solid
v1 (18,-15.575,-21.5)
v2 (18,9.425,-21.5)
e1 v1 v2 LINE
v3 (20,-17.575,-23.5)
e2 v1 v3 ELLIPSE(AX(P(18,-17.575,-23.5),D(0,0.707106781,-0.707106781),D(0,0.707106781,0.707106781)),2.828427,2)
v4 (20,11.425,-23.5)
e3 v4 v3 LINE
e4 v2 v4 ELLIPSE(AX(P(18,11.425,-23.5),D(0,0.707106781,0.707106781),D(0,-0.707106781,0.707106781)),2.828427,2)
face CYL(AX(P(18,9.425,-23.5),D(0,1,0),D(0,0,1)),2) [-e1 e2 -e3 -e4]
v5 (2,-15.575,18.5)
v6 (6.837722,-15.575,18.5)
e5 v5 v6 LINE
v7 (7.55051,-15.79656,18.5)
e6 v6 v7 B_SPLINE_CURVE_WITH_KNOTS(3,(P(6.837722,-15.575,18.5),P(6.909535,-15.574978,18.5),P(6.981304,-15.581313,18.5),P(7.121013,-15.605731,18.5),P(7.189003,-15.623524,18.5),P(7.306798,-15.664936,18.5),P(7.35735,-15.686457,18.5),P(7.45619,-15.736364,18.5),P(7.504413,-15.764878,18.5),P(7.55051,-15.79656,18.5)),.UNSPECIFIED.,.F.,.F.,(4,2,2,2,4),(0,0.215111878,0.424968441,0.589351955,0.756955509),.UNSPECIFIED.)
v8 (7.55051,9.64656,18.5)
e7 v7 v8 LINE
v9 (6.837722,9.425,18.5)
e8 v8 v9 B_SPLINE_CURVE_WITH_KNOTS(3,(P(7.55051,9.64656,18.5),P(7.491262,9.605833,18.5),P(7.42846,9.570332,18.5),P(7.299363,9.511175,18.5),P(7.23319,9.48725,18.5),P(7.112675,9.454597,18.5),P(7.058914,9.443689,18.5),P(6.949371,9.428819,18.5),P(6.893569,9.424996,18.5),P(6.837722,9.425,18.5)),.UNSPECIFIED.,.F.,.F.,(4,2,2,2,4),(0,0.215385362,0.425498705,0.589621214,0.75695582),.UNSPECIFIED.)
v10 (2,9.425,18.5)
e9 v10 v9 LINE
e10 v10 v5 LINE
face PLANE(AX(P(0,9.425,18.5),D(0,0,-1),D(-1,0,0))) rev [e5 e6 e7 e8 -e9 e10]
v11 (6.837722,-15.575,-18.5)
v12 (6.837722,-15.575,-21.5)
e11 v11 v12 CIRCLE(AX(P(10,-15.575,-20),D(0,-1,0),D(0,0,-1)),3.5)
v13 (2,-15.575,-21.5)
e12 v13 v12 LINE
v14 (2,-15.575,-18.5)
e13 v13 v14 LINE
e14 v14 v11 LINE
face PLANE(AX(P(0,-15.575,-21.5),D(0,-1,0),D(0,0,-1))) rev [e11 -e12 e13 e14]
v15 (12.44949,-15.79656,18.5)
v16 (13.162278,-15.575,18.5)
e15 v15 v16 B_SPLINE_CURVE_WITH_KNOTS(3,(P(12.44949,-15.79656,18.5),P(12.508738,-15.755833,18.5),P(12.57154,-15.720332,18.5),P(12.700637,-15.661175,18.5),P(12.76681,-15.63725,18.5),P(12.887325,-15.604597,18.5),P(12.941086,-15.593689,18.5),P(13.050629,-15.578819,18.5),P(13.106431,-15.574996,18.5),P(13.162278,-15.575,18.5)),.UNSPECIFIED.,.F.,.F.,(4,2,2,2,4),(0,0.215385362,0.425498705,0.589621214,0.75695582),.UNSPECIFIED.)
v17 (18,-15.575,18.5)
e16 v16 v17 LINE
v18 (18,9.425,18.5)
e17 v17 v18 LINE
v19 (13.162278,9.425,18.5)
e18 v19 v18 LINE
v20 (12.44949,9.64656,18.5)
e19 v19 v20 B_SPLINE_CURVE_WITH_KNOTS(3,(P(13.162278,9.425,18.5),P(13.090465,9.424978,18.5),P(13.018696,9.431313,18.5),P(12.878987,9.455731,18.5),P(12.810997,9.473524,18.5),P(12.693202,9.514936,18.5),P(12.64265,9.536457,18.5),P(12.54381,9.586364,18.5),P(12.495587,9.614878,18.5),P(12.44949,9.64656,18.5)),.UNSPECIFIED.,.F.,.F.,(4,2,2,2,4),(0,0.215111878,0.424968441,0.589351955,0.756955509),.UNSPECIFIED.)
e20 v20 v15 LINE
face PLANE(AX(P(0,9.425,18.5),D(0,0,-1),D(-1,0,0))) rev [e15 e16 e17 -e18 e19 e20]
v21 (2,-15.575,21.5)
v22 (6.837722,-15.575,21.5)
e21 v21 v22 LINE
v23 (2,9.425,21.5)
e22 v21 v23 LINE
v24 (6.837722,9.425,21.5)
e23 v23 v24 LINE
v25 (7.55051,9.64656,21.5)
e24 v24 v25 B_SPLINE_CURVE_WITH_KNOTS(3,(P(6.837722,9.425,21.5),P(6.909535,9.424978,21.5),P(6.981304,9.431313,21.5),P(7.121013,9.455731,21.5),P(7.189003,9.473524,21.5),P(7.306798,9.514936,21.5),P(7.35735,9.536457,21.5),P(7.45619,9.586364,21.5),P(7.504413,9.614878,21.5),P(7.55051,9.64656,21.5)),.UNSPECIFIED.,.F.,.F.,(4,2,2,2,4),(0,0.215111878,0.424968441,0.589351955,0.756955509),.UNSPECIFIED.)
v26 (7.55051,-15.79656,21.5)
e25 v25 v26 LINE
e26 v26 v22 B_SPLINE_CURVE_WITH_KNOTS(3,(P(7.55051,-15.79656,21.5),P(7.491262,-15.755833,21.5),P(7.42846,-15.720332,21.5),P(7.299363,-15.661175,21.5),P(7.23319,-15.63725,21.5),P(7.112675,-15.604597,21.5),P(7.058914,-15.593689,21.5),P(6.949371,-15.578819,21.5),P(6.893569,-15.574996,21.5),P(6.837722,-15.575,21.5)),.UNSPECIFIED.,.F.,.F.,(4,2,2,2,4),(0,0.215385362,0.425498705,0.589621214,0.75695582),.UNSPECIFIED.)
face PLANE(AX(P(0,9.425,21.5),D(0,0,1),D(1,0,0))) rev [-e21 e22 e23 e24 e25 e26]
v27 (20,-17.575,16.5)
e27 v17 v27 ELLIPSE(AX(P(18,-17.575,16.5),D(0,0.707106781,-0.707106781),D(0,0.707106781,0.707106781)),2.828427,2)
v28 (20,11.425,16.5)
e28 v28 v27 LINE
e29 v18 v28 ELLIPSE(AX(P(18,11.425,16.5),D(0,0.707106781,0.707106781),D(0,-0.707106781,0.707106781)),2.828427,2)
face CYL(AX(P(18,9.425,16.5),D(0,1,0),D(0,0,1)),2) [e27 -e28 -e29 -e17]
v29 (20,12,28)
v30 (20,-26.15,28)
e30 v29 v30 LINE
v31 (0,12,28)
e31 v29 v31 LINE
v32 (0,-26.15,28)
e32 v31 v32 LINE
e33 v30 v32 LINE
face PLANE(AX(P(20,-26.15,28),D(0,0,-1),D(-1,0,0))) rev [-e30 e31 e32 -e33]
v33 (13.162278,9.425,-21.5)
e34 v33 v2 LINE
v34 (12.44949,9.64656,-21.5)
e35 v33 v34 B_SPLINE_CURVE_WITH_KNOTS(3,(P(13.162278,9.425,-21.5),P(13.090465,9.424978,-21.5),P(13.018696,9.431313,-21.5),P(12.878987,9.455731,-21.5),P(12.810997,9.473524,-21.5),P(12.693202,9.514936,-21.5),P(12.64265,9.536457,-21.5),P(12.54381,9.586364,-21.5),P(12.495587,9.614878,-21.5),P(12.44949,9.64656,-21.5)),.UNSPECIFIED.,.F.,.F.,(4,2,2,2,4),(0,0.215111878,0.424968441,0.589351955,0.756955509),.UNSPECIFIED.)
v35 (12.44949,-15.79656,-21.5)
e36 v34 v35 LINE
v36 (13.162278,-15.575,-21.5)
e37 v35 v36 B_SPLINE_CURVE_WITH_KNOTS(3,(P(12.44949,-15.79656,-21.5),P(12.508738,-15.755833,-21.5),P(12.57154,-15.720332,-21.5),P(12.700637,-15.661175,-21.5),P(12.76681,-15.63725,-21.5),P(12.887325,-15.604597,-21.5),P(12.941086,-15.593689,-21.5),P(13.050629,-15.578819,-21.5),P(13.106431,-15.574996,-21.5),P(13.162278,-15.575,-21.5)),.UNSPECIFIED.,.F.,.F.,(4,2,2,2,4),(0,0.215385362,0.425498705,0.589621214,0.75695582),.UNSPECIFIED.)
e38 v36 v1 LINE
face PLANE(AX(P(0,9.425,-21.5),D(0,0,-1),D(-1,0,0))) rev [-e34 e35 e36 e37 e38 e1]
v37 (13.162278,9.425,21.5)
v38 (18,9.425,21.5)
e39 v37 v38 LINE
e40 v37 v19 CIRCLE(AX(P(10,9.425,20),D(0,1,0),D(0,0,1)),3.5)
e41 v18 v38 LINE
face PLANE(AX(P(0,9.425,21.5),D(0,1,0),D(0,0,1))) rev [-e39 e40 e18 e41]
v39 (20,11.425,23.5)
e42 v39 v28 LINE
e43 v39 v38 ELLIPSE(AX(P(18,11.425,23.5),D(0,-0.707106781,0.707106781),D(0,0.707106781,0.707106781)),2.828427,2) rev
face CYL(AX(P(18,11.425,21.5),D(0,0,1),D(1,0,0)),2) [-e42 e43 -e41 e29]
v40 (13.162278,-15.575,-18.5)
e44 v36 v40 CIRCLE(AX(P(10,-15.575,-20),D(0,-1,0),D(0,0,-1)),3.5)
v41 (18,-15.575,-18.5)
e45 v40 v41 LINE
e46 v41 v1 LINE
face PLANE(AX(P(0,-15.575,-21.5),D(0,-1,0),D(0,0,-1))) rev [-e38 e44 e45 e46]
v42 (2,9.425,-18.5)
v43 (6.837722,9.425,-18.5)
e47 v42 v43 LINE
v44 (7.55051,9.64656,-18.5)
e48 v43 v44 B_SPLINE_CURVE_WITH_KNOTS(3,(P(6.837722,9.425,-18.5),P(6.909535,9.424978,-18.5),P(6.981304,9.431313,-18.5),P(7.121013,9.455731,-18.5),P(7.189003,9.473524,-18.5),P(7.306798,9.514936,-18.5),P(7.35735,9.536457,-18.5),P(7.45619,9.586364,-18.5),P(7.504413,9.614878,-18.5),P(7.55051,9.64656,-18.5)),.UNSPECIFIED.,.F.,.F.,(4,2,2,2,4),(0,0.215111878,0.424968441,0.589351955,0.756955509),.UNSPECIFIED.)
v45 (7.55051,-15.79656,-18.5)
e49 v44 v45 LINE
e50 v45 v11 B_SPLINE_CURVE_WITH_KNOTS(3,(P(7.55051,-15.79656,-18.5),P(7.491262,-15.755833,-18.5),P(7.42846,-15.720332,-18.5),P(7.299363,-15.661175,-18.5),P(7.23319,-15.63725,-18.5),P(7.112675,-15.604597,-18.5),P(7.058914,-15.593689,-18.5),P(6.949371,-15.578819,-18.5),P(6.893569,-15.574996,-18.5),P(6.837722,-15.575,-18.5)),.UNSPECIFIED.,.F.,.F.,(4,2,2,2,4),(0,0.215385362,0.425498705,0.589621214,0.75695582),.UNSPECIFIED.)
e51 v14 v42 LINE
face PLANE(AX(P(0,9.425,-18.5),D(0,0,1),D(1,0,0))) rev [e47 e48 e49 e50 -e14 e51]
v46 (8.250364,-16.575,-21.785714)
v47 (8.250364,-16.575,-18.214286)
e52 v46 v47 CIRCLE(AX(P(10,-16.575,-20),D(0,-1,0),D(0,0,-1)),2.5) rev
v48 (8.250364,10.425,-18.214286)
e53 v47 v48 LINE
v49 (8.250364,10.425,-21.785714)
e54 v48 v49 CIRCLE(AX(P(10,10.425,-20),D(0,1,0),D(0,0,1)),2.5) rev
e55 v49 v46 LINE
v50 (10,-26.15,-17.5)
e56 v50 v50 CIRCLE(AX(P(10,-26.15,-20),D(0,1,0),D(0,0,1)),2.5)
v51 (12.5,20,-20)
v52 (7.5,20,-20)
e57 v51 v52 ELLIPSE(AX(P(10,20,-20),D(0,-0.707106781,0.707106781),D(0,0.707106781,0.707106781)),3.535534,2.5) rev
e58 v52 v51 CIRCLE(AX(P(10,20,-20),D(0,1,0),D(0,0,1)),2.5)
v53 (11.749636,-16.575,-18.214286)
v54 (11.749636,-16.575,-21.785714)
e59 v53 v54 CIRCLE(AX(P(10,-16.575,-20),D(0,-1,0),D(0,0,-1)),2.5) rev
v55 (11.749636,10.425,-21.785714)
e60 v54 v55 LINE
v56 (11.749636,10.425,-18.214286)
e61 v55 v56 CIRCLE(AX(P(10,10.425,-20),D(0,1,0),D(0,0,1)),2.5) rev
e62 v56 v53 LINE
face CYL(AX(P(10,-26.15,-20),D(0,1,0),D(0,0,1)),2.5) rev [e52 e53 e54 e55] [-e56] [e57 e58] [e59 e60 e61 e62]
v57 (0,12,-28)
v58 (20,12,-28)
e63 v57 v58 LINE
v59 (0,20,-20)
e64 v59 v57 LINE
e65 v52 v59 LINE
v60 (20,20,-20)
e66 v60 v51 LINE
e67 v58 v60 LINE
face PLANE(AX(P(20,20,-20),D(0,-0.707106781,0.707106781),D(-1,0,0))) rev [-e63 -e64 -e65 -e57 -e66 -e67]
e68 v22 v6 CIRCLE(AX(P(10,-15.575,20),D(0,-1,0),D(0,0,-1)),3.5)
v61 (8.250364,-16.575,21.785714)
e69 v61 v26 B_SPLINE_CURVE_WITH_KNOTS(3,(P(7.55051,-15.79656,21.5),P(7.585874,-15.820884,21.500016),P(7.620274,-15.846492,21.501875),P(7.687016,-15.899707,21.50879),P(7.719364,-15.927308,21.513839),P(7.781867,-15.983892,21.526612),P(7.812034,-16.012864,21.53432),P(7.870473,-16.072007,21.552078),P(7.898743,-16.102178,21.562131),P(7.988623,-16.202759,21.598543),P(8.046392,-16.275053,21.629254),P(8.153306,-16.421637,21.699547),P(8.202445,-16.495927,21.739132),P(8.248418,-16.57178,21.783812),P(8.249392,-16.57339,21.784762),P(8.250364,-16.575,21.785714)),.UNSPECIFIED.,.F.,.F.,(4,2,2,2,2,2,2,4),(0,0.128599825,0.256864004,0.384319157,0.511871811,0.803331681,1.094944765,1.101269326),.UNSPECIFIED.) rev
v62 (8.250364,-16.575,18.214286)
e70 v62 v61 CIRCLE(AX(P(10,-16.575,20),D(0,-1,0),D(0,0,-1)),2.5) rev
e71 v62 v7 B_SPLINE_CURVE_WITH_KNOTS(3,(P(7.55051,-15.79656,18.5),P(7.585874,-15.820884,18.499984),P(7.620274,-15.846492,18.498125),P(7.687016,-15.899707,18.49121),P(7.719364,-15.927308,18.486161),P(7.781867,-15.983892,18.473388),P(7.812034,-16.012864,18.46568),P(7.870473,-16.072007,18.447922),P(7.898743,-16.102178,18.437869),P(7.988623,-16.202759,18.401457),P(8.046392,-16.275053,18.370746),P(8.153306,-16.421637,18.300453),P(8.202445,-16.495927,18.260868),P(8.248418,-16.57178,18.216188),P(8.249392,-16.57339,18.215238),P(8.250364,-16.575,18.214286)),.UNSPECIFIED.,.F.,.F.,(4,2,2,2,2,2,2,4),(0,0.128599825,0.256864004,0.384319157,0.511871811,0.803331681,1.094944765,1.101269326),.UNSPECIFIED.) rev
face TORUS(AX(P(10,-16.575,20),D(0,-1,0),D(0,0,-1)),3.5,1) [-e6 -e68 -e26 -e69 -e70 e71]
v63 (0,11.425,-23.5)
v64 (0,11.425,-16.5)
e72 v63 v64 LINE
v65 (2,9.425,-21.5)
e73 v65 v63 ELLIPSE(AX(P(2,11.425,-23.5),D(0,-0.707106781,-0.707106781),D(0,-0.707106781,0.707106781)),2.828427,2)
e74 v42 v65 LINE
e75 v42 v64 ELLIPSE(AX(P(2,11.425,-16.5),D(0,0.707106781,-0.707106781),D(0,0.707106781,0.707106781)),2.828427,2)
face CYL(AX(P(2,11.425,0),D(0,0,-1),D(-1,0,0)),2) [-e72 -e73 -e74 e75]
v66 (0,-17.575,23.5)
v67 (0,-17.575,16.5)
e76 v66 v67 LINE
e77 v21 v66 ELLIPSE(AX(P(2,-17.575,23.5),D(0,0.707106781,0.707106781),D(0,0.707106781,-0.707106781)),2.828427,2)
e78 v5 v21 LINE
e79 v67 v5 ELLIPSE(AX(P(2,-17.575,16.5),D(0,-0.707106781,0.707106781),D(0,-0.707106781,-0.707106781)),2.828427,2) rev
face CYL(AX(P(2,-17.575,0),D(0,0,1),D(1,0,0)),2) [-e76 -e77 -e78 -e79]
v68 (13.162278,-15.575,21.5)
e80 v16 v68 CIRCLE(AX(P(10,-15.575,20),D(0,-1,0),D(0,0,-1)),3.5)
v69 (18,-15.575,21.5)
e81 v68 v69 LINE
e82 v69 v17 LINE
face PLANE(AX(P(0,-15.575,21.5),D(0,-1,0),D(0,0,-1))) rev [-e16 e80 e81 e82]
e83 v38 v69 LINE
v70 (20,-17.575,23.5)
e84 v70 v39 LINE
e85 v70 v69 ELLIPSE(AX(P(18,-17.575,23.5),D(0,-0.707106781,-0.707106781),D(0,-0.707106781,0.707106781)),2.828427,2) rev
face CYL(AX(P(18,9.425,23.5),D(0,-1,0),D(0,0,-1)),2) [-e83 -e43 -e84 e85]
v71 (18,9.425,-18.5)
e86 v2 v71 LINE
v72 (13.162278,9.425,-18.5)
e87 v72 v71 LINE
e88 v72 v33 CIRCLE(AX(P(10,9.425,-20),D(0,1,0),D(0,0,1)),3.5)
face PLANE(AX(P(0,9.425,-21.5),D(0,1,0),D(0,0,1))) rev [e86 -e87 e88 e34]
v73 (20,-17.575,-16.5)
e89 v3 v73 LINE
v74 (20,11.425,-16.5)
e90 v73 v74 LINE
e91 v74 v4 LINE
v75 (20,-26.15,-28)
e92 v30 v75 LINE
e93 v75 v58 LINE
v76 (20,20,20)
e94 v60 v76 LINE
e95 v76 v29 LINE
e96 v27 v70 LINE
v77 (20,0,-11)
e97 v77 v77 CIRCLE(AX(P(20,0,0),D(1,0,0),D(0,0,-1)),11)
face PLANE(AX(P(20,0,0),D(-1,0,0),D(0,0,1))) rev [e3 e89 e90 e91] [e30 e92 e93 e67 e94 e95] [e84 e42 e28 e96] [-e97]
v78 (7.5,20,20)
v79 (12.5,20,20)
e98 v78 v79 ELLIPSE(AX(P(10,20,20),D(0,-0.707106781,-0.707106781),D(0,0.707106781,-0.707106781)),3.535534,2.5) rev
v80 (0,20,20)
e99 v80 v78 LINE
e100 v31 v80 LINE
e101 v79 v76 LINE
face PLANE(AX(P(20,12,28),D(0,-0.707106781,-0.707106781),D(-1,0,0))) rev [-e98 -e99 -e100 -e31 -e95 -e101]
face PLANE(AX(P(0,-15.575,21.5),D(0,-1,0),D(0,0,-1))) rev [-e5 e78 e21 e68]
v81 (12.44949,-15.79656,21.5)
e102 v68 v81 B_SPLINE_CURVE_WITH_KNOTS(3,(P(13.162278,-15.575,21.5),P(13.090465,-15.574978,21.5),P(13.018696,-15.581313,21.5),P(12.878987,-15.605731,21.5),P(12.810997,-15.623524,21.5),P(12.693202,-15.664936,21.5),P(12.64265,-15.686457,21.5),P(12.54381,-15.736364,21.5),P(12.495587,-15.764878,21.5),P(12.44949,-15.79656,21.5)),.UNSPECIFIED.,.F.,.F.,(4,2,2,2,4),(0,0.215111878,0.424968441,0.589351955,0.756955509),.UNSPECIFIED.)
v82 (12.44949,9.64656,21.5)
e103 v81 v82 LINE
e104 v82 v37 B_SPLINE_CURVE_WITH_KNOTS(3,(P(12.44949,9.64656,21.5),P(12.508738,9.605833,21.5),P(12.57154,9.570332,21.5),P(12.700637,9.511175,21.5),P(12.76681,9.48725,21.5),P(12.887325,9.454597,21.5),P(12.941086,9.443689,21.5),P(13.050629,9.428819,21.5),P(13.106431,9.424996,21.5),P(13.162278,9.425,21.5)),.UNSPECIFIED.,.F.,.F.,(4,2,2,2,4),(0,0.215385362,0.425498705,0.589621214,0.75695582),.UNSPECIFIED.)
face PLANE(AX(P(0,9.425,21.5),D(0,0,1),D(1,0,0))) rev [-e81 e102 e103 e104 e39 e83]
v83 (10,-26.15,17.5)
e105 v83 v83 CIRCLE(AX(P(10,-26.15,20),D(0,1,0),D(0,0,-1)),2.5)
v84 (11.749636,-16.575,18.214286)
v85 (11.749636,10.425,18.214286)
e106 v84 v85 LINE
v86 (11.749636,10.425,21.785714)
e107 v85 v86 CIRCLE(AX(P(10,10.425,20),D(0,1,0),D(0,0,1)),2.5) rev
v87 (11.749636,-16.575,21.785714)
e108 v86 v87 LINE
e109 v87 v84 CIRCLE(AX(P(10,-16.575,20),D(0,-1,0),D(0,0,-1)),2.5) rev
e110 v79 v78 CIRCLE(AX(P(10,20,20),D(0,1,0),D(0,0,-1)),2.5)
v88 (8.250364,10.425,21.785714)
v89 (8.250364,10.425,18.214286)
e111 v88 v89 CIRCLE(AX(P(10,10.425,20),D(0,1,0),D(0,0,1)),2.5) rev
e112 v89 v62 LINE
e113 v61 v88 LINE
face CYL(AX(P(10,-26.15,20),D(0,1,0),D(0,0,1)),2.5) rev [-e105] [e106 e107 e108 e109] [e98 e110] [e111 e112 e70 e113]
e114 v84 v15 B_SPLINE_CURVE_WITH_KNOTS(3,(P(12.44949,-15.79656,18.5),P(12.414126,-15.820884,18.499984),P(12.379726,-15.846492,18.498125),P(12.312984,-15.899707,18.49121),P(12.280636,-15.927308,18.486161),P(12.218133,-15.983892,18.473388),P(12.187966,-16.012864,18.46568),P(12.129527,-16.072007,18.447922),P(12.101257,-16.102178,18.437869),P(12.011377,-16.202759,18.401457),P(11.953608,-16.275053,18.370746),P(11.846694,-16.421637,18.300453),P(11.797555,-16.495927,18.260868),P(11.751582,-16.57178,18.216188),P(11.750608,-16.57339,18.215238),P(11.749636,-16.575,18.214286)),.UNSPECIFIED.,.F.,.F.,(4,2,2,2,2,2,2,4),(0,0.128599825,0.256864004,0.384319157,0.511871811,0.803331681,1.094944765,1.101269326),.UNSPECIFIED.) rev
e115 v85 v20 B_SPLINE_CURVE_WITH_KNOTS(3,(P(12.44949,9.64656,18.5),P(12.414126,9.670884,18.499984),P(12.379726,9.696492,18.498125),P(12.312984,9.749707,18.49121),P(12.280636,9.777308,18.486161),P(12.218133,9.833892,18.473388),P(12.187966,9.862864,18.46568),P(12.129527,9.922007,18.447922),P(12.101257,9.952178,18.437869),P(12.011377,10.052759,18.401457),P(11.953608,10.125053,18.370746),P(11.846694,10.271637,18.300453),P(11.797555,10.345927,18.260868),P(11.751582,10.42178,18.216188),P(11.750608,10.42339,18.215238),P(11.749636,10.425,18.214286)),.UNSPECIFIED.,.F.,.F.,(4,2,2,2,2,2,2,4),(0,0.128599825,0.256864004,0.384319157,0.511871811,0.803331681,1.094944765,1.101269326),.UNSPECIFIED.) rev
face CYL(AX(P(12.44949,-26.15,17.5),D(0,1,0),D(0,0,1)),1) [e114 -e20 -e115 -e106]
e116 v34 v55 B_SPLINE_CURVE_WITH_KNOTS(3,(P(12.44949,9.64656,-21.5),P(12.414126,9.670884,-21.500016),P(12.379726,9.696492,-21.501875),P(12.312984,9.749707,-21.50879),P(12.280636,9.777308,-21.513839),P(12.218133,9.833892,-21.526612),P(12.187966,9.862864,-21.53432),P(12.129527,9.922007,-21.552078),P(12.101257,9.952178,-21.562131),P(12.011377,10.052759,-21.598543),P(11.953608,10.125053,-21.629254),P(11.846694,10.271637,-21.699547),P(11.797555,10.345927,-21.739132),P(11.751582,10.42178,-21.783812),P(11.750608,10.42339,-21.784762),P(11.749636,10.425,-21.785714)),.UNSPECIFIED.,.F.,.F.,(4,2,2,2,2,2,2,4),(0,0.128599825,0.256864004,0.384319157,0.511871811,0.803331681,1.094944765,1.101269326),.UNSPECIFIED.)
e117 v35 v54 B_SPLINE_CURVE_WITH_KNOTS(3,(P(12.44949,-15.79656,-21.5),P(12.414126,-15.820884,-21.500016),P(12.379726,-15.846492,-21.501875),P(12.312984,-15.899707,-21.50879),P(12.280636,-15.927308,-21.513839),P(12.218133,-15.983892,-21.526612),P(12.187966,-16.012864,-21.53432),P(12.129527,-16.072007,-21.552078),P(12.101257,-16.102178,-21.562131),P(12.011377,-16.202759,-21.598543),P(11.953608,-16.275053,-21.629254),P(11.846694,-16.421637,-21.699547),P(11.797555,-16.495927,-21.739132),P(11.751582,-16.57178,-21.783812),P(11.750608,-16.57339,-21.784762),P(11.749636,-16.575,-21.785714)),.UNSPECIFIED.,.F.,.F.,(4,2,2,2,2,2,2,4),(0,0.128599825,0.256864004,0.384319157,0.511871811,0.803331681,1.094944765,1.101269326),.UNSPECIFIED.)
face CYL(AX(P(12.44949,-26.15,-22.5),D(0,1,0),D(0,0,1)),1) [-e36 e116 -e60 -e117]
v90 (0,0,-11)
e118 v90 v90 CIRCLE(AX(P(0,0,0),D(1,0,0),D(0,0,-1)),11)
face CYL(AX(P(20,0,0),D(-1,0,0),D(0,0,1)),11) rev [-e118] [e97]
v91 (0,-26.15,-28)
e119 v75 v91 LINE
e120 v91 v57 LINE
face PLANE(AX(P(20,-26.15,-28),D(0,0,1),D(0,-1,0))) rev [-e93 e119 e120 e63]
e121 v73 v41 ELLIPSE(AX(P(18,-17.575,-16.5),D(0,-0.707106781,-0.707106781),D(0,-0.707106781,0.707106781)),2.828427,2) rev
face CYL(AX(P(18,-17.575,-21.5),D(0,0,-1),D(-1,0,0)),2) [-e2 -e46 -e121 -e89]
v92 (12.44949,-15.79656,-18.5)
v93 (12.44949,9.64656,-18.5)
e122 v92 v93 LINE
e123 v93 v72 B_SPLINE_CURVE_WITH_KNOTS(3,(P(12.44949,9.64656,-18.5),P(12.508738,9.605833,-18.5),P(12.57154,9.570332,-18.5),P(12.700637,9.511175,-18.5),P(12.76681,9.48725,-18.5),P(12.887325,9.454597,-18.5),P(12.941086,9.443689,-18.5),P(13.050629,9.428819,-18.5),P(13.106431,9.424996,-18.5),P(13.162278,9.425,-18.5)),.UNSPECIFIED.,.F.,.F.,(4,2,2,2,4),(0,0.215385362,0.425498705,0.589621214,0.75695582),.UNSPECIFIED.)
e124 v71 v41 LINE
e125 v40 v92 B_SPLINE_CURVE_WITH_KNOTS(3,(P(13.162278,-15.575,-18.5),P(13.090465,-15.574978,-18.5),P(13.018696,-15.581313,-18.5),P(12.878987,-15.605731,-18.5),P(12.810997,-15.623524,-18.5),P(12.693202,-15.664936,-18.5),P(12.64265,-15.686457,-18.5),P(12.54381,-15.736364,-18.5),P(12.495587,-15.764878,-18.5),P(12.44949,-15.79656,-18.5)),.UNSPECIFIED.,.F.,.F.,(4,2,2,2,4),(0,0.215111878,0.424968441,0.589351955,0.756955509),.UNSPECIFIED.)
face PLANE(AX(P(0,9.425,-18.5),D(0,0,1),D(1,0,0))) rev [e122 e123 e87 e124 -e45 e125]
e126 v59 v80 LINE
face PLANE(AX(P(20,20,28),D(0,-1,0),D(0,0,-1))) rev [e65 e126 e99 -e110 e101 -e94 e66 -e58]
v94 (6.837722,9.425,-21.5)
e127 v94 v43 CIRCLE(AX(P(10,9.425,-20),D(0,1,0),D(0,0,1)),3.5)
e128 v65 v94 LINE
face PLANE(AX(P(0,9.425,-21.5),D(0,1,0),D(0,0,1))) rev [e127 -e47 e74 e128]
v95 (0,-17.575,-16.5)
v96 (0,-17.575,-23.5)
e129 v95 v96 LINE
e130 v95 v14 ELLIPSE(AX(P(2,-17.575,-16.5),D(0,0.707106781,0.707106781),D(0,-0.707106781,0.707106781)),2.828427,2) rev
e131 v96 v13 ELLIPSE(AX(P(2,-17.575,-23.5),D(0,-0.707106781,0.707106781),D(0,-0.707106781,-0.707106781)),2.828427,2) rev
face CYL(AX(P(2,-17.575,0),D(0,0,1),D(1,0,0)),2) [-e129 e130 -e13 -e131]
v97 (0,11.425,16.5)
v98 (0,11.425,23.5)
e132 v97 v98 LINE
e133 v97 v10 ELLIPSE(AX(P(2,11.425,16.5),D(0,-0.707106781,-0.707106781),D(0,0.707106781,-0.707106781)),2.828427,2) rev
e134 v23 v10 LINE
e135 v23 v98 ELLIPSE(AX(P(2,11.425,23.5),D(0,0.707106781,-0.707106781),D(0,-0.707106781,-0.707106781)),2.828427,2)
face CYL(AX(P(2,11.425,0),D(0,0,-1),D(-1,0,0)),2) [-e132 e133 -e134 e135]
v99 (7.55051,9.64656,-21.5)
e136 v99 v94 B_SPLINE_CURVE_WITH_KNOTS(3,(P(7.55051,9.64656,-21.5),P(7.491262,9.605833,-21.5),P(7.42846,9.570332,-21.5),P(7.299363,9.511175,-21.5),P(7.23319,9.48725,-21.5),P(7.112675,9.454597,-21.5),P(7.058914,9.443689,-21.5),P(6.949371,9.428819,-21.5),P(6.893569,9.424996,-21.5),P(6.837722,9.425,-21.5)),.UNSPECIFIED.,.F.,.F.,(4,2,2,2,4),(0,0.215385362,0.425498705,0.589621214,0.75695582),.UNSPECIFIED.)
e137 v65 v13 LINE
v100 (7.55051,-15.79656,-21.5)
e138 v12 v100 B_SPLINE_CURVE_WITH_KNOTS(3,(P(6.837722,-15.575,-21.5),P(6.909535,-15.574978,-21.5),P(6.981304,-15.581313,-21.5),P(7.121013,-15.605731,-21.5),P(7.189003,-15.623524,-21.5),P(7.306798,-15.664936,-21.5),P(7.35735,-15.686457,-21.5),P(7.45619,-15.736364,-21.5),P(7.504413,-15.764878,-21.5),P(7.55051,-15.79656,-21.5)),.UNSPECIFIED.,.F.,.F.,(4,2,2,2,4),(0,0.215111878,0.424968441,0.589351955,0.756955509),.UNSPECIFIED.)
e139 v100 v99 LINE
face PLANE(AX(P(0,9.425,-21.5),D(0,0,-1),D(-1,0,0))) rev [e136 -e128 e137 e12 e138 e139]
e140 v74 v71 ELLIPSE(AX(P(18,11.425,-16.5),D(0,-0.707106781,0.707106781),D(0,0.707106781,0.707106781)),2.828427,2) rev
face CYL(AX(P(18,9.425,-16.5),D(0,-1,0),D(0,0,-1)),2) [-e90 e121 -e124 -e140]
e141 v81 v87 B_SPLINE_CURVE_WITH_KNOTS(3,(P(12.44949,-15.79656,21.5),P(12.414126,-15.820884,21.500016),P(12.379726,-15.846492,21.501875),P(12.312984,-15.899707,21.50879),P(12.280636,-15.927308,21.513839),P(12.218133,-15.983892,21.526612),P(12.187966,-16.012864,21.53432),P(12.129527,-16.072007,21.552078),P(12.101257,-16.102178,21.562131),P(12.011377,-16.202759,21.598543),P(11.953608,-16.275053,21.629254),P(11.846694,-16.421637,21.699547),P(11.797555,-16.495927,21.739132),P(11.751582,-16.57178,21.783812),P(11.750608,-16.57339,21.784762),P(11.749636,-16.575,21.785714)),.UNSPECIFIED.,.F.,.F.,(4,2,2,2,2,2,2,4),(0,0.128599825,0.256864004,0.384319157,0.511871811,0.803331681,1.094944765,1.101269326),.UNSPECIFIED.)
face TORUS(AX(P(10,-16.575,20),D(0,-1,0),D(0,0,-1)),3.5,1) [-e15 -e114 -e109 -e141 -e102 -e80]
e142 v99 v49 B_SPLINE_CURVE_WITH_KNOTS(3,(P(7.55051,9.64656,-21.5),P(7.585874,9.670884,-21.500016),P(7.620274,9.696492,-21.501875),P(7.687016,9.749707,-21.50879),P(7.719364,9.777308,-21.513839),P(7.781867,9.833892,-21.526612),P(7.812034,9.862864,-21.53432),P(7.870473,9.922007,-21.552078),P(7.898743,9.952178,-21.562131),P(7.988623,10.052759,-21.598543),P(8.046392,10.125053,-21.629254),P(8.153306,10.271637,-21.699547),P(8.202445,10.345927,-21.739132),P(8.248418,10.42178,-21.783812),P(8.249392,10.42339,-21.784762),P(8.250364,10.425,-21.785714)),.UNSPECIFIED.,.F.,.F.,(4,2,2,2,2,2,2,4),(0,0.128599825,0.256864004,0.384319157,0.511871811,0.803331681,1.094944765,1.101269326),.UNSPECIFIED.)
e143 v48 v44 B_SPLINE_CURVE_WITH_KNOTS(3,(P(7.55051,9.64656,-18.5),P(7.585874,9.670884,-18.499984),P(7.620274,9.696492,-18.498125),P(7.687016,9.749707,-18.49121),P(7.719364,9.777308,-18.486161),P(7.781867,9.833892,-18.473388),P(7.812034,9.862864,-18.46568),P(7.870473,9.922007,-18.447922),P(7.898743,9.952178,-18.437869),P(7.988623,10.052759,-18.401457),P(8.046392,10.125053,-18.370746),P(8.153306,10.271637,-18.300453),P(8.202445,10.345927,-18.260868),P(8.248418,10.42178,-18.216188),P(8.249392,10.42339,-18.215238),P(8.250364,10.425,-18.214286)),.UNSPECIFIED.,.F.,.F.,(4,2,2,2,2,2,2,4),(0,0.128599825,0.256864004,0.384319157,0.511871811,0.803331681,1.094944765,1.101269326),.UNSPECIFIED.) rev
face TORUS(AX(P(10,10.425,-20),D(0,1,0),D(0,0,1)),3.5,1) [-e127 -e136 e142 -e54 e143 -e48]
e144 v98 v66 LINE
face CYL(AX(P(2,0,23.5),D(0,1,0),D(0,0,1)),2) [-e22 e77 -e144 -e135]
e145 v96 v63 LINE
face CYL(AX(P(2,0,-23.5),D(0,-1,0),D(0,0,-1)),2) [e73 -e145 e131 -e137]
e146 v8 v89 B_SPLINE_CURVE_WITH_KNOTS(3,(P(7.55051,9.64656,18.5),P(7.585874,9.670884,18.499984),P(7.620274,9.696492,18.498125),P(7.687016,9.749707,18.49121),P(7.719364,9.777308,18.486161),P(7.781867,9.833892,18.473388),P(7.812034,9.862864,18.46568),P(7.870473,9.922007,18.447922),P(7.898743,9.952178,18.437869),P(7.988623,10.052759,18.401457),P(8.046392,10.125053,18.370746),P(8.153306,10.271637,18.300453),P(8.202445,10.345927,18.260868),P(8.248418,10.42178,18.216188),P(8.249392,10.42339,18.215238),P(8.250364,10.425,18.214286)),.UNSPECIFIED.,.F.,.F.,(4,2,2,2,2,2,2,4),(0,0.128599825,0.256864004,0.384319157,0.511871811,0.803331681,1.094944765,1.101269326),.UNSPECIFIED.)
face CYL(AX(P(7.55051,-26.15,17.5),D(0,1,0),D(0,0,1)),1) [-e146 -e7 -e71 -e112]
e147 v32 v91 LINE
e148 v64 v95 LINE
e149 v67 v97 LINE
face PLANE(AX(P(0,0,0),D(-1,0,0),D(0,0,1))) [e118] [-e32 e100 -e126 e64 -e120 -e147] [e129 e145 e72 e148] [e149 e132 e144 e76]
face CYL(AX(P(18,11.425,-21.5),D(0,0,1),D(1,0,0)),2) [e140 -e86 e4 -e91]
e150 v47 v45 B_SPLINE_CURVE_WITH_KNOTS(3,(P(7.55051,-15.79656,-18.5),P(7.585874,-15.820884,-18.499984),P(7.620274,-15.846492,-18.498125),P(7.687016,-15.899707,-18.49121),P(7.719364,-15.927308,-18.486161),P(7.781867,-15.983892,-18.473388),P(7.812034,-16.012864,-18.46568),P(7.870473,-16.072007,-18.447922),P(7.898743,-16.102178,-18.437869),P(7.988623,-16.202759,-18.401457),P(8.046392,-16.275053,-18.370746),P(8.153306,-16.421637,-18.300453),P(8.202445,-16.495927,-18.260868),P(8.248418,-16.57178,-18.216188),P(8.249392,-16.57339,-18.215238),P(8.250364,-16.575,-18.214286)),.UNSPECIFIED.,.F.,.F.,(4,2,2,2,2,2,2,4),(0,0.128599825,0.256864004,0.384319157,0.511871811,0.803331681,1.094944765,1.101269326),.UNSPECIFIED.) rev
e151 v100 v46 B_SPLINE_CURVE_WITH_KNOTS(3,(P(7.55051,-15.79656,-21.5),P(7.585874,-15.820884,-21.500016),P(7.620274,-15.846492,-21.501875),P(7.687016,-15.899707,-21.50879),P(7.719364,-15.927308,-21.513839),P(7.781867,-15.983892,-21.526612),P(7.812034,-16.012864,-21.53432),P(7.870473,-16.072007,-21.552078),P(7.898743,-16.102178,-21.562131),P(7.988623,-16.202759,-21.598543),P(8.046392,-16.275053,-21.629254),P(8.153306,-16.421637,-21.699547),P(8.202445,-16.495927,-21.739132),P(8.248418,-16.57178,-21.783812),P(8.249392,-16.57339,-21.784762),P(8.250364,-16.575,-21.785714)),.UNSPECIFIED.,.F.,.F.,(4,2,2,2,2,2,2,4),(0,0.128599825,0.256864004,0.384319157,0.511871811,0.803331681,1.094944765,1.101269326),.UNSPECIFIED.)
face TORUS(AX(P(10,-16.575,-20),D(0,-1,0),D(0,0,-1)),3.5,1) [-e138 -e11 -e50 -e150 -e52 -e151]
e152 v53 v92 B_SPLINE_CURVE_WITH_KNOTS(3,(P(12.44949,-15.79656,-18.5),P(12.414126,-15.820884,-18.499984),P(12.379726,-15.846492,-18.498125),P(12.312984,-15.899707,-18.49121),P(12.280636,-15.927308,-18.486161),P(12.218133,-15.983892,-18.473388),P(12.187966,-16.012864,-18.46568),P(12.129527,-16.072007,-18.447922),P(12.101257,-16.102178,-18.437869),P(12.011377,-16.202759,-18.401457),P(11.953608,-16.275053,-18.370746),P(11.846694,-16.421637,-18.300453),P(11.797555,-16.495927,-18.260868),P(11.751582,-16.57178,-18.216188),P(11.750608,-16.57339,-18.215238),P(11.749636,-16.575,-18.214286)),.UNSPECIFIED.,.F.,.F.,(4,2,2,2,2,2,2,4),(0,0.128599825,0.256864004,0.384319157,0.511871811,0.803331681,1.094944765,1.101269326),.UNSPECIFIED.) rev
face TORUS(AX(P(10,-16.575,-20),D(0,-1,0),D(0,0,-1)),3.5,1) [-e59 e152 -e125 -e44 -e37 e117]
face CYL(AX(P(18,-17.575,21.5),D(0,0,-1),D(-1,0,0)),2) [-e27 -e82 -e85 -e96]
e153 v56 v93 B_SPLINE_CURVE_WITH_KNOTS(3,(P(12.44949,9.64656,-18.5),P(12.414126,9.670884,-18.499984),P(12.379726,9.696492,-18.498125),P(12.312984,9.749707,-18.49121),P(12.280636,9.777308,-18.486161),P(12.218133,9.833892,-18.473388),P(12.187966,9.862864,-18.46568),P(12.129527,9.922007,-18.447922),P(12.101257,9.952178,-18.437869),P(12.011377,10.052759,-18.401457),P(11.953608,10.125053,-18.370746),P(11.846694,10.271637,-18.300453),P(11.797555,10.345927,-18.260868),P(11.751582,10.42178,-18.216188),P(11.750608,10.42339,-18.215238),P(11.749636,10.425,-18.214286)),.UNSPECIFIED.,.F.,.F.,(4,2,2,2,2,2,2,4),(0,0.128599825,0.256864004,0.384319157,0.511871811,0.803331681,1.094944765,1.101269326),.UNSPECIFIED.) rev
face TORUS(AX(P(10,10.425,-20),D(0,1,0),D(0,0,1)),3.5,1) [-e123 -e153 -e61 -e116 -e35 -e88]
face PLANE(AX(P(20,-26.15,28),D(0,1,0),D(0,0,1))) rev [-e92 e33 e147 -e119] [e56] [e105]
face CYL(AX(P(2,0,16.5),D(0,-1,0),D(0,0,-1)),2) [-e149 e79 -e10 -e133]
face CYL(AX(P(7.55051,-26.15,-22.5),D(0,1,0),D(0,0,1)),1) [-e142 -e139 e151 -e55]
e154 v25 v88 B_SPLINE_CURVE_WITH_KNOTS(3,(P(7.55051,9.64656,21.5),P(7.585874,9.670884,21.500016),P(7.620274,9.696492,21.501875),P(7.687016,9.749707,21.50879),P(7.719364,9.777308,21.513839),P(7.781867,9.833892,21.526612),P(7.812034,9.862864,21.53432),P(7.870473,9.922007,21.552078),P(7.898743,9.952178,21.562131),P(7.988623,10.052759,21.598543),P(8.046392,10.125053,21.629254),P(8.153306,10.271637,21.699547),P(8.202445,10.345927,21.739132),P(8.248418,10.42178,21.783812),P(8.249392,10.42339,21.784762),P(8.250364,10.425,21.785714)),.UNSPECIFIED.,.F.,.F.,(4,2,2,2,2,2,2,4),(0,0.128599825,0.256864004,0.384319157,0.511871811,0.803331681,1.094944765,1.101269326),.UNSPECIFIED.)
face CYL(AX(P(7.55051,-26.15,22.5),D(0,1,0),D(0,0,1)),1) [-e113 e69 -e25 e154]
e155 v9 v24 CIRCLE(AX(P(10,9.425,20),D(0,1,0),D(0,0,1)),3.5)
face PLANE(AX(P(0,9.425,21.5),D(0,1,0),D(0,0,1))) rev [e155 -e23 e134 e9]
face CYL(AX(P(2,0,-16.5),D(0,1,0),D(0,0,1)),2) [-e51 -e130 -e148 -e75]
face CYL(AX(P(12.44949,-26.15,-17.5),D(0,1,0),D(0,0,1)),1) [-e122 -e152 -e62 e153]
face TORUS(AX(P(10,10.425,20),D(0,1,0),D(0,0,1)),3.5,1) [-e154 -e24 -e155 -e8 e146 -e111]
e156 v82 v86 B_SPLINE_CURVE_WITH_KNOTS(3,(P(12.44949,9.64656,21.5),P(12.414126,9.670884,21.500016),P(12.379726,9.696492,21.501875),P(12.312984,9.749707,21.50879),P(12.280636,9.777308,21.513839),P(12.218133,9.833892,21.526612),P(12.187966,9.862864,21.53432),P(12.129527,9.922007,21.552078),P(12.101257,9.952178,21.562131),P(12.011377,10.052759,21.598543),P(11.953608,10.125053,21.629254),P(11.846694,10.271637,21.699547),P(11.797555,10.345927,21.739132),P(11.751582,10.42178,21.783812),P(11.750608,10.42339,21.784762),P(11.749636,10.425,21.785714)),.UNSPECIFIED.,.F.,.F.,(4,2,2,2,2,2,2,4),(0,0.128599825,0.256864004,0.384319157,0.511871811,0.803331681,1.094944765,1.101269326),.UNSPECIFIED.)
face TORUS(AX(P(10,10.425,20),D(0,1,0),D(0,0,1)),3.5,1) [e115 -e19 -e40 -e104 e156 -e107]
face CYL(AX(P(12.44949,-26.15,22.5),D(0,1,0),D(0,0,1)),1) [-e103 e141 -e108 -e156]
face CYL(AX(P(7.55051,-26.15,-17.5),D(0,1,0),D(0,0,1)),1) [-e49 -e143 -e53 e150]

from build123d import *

# Parameters (mm, degrees)
SKETCH_2_W          = 56
SKETCH_2_H          = 46.15
SKETCH_2_R          = 11
EXTRUDE_1_DEPTH     = 20
SKETCH_3_R          = 2.5
CUT_EXTRUDE_1_DEPTH = 58.565810165
SKETCH_4_W          = 3
SKETCH_4_H          = 25
CUT_EXTRUDE_2_DEPTH = 44.218312091
CHAMFER_1_SIZE      = 8
FILLET_1_R          = 1
FILLET_2_R          = 2


with BuildPart() as part:
    # 스케치2 → 보스-돌출1 (new body)
    with BuildSketch(Plane(origin=(0, 0, 0), x_dir=(0, 0, -1), z_dir=(1, 0, 0))):
        with Locations((0, -3.075)):
            Rectangle(SKETCH_2_W, SKETCH_2_H)
        Circle(SKETCH_2_R, mode=Mode.SUBTRACT)
    extrude(amount=EXTRUDE_1_DEPTH)

    # 스케치3 → 컷-돌출1 (cut, through all)
    with BuildSketch(Plane(origin=(0, 20, 0), x_dir=(1, 0, 0), z_dir=(0, 1, 0))):
        with Locations(Location((10, 20, 0), (0, 0, 270))):
            Circle(SKETCH_3_R)
        with Locations(Location((10, -20, 0), (0, 0, 90))):
            Circle(SKETCH_3_R)
    extrude(amount=-CUT_EXTRUDE_1_DEPTH, mode=Mode.SUBTRACT)

    # 스케치4 → 컷-돌출2 (cut, through all)
    with BuildSketch(Plane(origin=(20, 0, 0), x_dir=(0, 0, -1), z_dir=(1, 0, 0))):
        with Locations((-20, -3.075)):
            Rectangle(SKETCH_4_W, SKETCH_4_H)
        with Locations((20, -3.075)):
            Rectangle(SKETCH_4_W, SKETCH_4_H)
    extrude(amount=-CUT_EXTRUDE_2_DEPTH, mode=Mode.SUBTRACT)

    # 모따기1
    # the kernel refuses this chamfer: 8 mm, written as the material it takes off along each edge
    with BuildSketch(Plane(origin=(-20.573463904, 20, 28), x_dir=(0, -0.9996219169112968, 0.027495876610586494), z_dir=(1, 0, 0))) as chamfer_1_piece_1:
        Polygon((CHAMFER_1_SIZE * 0.999621916911, CHAMFER_1_SIZE * 0.0274958766106), (-CHAMFER_1_SIZE * 0.0274958766106, CHAMFER_1_SIZE * 0.999621916911), (0, 0), align=None)
    extrude(amount=61.146927807, mode=Mode.SUBTRACT)
    with BuildSketch(Plane(origin=(-20.573463904, 20, -28), x_dir=(0, -0.9996219169112968, -0.027495876610586494), z_dir=(1, 0, 0))) as chamfer_1_piece_2:
        Polygon((CHAMFER_1_SIZE * 0.999621916911, -CHAMFER_1_SIZE * 0.0274958766106), (-CHAMFER_1_SIZE * 0.0274958766106, -CHAMFER_1_SIZE * 0.999621916911), (0, 0), align=None)
    extrude(amount=61.146927807, mode=Mode.SUBTRACT)

    # 필렛1
    fillet_1_edges = [part.edges().sort_by_distance(p)[0] for p in [
        (12.5, 9.425, -20),
        (12, -3.075, -18.5),
        (12.5, -15.575, -20),
        (12, -3.075, -21.5),
        (7.5, 9.425, -20),
        (8, -3.075, -18.5),
        (7.5, -15.575, -20),
        (8, -3.075, -21.5),
        (12.5, -15.575, 20),
        (12, -3.075, 18.5),
        (12.5, 9.425, 20),
        (12, -3.075, 21.5),
        (7.5, -15.575, 20),
        (8, -3.075, 18.5),
        (7.5, 9.425, 20),
        (8, -3.075, 21.5),
    ]]
    fillet(fillet_1_edges, radius=FILLET_1_R)

    # 필렛2
    fillet_2_edges = [part.edges().sort_by_distance(p)[0] for p in [
        (0, -3.075, 21.5),
        (0, 9.425, 20),
        (0, -3.075, 18.5),
        (0, -15.575, 20),
        (20, -3.075, 21.5),
        (20, -15.575, 20),
        (20, -3.075, 18.5),
        (20, 9.425, 20),
        (0, -3.075, -21.5),
        (0, -15.575, -20),
        (0, -3.075, -18.5),
        (0, 9.425, -20),
        (20, -3.075, -21.5),
        (20, 9.425, -20),
        (20, -3.075, -18.5),
        (20, -15.575, -20),
    ]]
    fillet(fillet_2_edges, radius=FILLET_2_R)


solid = part.part
